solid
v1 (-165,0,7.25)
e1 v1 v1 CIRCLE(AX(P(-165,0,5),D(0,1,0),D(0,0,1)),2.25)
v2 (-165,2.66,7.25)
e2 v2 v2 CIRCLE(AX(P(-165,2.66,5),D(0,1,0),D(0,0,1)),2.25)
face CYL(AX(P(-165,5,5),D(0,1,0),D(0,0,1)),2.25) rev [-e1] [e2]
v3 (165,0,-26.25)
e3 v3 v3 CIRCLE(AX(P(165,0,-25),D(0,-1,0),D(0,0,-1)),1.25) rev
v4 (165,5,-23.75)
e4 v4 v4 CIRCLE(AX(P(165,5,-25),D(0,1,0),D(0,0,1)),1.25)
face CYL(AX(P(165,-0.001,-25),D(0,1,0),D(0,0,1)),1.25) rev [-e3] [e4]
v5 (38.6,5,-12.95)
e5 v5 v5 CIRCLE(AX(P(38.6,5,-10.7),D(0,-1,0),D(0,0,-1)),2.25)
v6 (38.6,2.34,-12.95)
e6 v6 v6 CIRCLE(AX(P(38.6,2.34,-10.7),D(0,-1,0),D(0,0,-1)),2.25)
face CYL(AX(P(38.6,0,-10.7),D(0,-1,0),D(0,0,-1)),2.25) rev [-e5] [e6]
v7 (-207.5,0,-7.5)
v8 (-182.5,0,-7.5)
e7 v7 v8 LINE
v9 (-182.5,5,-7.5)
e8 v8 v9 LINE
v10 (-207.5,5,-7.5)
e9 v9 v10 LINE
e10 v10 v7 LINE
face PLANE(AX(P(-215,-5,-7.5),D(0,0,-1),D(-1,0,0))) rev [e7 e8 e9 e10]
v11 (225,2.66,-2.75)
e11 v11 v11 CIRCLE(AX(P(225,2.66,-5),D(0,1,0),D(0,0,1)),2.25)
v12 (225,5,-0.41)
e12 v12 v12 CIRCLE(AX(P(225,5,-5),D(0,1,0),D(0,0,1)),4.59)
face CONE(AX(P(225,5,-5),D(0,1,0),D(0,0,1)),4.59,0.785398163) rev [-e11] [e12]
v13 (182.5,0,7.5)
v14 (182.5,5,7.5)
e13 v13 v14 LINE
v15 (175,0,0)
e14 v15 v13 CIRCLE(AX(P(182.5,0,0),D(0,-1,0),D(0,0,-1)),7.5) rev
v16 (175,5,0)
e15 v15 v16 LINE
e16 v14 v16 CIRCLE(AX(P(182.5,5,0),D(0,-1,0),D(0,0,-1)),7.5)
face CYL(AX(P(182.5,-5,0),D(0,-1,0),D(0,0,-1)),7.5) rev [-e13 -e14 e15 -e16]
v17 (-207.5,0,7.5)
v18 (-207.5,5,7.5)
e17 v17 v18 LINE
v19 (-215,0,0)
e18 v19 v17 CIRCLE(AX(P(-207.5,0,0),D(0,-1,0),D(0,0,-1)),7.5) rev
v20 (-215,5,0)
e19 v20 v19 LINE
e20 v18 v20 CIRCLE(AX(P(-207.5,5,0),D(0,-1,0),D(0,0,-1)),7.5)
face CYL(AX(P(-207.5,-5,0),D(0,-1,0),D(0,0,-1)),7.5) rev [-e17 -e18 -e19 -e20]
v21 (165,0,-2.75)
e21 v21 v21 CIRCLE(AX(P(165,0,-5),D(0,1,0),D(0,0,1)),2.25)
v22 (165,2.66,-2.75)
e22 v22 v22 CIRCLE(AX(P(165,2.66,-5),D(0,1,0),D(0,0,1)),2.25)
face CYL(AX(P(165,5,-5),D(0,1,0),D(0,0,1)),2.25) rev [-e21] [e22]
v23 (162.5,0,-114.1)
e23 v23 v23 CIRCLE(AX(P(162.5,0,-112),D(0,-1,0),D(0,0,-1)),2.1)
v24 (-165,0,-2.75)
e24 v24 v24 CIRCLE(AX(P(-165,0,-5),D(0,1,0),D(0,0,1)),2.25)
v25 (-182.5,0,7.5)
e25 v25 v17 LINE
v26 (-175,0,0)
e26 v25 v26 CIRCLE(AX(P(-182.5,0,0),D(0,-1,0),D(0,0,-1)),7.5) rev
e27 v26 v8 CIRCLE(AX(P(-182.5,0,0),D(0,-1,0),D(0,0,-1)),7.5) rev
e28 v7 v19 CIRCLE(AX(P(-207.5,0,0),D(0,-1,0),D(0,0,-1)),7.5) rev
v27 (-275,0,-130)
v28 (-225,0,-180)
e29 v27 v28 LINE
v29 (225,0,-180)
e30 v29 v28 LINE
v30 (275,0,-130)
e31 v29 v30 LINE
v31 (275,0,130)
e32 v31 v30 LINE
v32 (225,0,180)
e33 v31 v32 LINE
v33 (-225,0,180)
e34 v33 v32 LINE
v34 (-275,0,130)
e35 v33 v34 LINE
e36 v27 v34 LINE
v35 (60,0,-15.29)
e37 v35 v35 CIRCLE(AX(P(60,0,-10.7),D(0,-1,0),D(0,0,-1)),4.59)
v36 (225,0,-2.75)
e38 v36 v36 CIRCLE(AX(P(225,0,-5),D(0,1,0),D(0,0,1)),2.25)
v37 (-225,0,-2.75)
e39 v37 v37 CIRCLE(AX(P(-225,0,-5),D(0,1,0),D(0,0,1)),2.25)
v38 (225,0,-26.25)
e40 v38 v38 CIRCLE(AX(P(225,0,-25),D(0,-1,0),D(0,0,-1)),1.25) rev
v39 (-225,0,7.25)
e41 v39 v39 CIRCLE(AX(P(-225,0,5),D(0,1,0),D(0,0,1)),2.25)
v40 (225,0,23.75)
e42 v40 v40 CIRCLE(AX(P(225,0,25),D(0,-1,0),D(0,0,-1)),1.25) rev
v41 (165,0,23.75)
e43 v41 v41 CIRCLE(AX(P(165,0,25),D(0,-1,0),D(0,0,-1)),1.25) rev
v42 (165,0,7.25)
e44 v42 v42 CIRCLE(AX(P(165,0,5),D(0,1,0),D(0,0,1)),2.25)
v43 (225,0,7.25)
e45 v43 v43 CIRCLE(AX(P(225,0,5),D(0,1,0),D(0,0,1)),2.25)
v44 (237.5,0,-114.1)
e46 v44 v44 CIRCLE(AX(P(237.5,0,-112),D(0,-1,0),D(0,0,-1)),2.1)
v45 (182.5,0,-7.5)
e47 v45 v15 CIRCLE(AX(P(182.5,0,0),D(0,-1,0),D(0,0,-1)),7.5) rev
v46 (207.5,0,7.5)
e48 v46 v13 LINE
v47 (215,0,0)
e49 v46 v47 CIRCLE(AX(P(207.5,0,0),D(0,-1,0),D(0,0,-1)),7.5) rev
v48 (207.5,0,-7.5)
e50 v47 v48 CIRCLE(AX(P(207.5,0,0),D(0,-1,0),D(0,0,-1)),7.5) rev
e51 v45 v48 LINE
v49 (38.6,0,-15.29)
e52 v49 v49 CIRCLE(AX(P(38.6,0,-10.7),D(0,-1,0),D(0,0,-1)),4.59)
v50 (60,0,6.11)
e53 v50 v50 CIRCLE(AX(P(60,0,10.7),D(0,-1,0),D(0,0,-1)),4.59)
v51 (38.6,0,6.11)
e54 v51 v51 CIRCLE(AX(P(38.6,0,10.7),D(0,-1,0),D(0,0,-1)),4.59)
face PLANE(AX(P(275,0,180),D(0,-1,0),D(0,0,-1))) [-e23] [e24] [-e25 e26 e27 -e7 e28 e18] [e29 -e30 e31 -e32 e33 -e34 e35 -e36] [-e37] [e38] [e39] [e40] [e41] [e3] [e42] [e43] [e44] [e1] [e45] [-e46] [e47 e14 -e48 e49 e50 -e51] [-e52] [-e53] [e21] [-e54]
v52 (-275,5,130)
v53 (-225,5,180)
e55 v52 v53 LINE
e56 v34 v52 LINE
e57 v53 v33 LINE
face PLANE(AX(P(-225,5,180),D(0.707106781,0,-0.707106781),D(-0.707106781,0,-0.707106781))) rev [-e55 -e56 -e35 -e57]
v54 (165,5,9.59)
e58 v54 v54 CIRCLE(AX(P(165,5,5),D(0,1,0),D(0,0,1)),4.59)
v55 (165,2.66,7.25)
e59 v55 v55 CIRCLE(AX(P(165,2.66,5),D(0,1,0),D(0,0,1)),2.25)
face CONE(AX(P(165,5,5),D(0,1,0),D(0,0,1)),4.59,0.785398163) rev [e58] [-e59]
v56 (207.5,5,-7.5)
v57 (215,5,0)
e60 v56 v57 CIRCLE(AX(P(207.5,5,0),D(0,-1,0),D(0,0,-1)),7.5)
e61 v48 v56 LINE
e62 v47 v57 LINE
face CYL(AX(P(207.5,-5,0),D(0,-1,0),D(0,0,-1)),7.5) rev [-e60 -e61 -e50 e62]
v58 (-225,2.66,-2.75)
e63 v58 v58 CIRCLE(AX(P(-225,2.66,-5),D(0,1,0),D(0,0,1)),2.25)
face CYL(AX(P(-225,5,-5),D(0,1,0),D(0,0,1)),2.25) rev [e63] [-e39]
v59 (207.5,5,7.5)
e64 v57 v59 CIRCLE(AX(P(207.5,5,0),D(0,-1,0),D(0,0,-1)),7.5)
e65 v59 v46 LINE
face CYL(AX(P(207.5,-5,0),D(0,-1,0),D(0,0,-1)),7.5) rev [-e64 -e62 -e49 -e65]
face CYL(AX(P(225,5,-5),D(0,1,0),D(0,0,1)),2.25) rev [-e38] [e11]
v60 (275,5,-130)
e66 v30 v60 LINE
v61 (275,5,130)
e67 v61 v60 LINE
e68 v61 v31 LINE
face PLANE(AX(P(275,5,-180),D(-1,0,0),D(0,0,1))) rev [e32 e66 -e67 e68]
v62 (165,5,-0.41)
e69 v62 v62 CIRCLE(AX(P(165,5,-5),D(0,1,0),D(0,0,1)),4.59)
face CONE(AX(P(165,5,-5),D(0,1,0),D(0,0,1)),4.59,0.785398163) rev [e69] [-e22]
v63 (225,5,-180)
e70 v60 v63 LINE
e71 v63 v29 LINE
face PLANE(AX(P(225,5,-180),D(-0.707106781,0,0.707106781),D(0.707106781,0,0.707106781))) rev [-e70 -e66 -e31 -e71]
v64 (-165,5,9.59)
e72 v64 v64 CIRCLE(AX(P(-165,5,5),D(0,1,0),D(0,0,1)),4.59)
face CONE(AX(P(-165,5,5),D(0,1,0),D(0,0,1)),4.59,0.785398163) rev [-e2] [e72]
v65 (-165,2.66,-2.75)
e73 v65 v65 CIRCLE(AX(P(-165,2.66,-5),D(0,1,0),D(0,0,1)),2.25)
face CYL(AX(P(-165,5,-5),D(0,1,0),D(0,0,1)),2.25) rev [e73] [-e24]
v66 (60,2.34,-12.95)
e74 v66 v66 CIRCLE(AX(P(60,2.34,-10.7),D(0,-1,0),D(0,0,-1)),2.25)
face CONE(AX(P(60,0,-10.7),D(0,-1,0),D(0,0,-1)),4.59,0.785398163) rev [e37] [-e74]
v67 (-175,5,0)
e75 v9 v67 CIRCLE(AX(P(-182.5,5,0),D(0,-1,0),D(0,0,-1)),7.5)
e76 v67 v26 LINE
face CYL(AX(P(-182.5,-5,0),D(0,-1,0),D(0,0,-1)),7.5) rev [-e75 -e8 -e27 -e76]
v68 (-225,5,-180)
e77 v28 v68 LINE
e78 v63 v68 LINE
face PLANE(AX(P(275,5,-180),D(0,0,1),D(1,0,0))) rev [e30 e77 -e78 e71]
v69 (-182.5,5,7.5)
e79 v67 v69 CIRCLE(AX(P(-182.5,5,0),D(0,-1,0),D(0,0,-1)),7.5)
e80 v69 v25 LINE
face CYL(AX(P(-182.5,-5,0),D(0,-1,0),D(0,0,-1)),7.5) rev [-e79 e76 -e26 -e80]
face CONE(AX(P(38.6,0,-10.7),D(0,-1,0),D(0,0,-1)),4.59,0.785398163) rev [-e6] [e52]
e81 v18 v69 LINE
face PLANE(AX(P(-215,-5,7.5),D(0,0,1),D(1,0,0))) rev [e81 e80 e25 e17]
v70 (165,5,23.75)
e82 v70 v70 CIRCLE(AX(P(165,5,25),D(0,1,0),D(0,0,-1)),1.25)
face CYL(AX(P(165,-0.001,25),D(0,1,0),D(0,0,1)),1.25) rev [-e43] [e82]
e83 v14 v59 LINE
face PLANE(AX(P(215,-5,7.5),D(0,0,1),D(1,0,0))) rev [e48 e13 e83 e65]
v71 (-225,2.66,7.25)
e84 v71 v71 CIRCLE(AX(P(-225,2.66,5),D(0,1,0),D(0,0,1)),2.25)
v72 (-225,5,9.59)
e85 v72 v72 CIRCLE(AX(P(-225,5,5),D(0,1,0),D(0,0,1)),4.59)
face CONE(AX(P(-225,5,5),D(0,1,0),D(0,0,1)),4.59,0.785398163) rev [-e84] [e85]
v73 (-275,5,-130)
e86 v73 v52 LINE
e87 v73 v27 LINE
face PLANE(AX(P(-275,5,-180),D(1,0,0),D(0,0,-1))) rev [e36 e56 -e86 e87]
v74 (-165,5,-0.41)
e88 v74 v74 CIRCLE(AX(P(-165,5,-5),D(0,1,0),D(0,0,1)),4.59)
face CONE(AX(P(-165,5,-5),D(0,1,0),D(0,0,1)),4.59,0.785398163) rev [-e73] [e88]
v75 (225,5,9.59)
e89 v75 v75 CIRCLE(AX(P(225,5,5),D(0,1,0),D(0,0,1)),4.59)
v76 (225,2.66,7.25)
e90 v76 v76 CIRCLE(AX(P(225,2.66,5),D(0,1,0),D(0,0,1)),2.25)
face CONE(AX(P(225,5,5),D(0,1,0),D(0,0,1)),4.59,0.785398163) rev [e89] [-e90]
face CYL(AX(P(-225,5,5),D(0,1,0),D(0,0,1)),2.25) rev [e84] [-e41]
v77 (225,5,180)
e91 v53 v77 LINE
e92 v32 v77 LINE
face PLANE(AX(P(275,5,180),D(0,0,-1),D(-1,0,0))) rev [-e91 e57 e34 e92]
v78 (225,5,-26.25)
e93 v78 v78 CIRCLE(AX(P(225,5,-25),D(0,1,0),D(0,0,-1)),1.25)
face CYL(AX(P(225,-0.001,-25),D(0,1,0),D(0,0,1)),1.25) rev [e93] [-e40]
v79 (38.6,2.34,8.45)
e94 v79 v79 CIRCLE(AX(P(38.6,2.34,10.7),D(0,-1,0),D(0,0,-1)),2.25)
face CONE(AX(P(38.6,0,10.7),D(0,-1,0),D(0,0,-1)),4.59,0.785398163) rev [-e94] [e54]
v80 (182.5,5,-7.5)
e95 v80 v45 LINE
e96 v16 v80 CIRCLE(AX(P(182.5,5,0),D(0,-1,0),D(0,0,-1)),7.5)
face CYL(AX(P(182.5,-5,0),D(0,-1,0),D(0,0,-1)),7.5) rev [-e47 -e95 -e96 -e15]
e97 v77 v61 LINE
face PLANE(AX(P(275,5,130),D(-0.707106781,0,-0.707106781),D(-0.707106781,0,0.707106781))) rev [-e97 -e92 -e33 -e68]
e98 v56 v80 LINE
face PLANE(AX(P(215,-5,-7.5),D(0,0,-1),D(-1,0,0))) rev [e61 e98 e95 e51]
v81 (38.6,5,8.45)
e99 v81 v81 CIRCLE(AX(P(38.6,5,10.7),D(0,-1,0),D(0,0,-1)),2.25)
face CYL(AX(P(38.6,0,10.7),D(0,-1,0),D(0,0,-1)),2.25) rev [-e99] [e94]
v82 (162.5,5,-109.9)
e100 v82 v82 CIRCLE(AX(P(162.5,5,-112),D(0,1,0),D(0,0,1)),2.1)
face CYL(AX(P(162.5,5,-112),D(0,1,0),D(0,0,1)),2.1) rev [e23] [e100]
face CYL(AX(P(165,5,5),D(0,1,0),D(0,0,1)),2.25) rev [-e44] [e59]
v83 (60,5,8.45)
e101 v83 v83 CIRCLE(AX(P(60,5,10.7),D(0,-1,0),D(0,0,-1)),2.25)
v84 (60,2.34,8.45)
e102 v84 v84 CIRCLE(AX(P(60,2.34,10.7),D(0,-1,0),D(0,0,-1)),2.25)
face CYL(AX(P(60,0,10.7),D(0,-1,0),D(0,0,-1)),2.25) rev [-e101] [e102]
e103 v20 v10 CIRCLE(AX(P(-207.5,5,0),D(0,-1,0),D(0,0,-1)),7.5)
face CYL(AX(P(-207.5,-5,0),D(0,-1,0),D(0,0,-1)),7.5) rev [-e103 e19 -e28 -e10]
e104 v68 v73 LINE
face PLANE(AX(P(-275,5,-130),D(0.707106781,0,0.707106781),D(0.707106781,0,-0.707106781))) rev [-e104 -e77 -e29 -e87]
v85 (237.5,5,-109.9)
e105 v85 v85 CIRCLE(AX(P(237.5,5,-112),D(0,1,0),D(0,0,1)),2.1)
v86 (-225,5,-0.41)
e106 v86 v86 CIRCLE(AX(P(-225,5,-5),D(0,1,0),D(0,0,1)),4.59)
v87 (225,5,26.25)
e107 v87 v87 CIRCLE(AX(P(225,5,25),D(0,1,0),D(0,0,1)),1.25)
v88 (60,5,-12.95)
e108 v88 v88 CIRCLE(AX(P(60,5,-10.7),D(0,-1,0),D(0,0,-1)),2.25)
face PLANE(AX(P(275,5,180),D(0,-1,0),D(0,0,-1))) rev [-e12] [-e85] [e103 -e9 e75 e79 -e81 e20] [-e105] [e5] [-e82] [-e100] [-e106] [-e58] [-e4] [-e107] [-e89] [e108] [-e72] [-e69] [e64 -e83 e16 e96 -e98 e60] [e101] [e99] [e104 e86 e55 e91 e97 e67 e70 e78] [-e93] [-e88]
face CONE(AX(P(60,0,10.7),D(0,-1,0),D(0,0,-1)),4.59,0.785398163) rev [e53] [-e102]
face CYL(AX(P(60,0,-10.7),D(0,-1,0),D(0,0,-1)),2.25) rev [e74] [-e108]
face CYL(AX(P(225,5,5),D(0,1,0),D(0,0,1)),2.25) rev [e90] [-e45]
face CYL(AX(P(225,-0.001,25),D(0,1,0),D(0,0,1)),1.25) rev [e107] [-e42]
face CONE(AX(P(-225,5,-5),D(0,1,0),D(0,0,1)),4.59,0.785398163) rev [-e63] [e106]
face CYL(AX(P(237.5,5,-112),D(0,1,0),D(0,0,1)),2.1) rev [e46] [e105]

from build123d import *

# Parameters (mm, degrees)
SKETCH1_W                                            = 550
SKETCH1_H                                            = 360
BOSS_EXTRUDE1_DEPTH                                  = 5
SKETCH2_W                                            = 40
SKETCH2_H                                            = 15
CUT_EXTRUDE1_DEPTH                                   = 10
FILLET1_R                                            = 7.5
CHAMFER1_SIZE                                        = 50
SKETCH8_R                                            = 1.5
CUT_EXTRUDE5_DEPTH                                   = 10
CSK_FOR_M4_HEX_SOCKET_COUNTERSUNK_HEAD_S_D           = 4.5
CSK_FOR_M4_HEX_SOCKET_COUNTERSUNK_HEAD_S_CSINK_D     = 9.18
CSK_FOR_M4_HEX_SOCKET_COUNTERSUNK_HEAD_S_CSINK_ANGLE = 90
SKETCH10_R                                           = 2
CUT_EXTRUDE6_DEPTH                                   = 10
M5_TAPPED_HOLE1_D                                    = 4.2
M5_TAPPED_HOLE1_DEPTH                                = 12.4
M5_TAPPED_HOLE1_TIP                                  = 1.2618073
CUT_EXTRUDE8_REACH                                   = 330.71
SKETCH14_R                                           = 1.25
M3_TAPPED_HOLE1_D                                    = 2.5
M3_TAPPED_HOLE1_DEPTH                                = 7.5
M3_TAPPED_HOLE1_TIP                                  = 0.751075774
SKETCH16_R                                           = 1.5
CUT_EXTRUDE9_DEPTH                                   = 329.709598278
CSK_FOR_M4_HEX_SOCKET_COUNTERSUNK_HE_2_D             = 4.5
CSK_FOR_M4_HEX_SOCKET_COUNTERSUNK_HE_2_CSINK_D       = 9.18
CSK_FOR_M4_HEX_SOCKET_COUNTERSUNK_HE_2_CSINK_ANGLE   = 90


with BuildPart() as part:
    # Sketch1 → Boss-Extrude1 (new body)
    with BuildSketch(Plane(origin=(0, 0, 0), x_dir=(1, 0, 0), z_dir=(0, 1, 0))):
        Rectangle(SKETCH1_W, SKETCH1_H)
    extrude(amount=BOSS_EXTRUDE1_DEPTH)

    # Sketch2 → Cut-Extrude1 (cut)
    with BuildSketch(Plane(origin=(0, 5, 0), x_dir=(1, 0, 0), z_dir=(0, 1, 0))):
        with Locations((195, 0)):
            Rectangle(SKETCH2_W, SKETCH2_H)
        with Locations((-195, 0)):
            Rectangle(SKETCH2_W, SKETCH2_H)
    extrude(amount=-CUT_EXTRUDE1_DEPTH, mode=Mode.SUBTRACT)

    # Fillet1
    fillet1_edges = [part.edges().sort_by_distance(p)[0] for p in [
        (-175, 2.5, 7.5),
        (-175, 2.5, -7.5),
        (-215, 2.5, -7.5),
        (-215, 2.5, 7.5),
        (175, 2.5, 7.5),
        (175, 2.5, -7.5),
        (215, 2.5, -7.5),
        (215, 2.5, 7.5),
    ]]
    fillet(fillet1_edges, radius=FILLET1_R - 0.0001)  # a hair under: the kernel refuses the full size

    # Chamfer1
    chamfer1_edges = [part.edges().sort_by_distance(p)[0] for p in [
        (275, 2.5, 180),
        (-275, 2.5, 180),
        (-275, 2.5, -180),
        (275, 2.5, -180),
    ]]
    chamfer(chamfer1_edges, length=CHAMFER1_SIZE)

    # Sketch8 → Cut-Extrude5 (cut)
    with BuildSketch(Plane(origin=(0, 5, 0), x_dir=(1, 0, 0), z_dir=(0, 1, 0))):
        with Locations(Location((225, 5, 0), (0, 0, 270))):
            Circle(SKETCH8_R)
        with Locations(Location((165, 5, 0), (0, 0, 90))):
            Circle(SKETCH8_R)
        with Locations(Location((165, -5, 0), (0, 0, 270))):
            Circle(SKETCH8_R)
        with Locations(Location((225, -5, 0), (0, 0, 90))):
            Circle(SKETCH8_R)
        with Locations(Location((-225, -5, 0), (0, 0, 270))):
            Circle(SKETCH8_R)
        with Locations(Location((-165, -5, 0), (0, 0, 90))):
            Circle(SKETCH8_R)
        with Locations(Location((-165, 5, 0), (0, 0, 270))):
            Circle(SKETCH8_R)
        with Locations(Location((-225, 5, 0), (0, 0, 90))):
            Circle(SKETCH8_R)
    extrude(amount=-CUT_EXTRUDE5_DEPTH, mode=Mode.SUBTRACT)

    # CSK for M4 Hex Socket Countersunk Head S (through all)
    with Locations(Plane(origin=(-225, 5, -5), x_dir=(0, 0, 1), z_dir=(0, 1, 0))):
        with Locations((0, 0), (10, 0), (10, 60), (0, 60), (10, 390), (0, 390), (0, 450), (10, 450)):
            CounterSinkHole(CSK_FOR_M4_HEX_SOCKET_COUNTERSUNK_HEAD_S_D / 2, CSK_FOR_M4_HEX_SOCKET_COUNTERSUNK_HEAD_S_CSINK_D / 2, counter_sink_angle=CSK_FOR_M4_HEX_SOCKET_COUNTERSUNK_HEAD_S_CSINK_ANGLE)

    # Sketch10 → Cut-Extrude6 (cut)
    with BuildSketch(Plane(origin=(0, 5, 0), x_dir=(1, 0, 0), z_dir=(0, 1, 0))):
        with Locations(Location((237.5, 112, 0), (0, 0, 270))):
            Circle(SKETCH10_R)
        with Locations(Location((162.5, 112, 0), (0, 0, 90))):
            Circle(SKETCH10_R)
    extrude(amount=-CUT_EXTRUDE6_DEPTH, mode=Mode.SUBTRACT)

    # M5 Tapped Hole1
    with Locations(Plane(origin=(237.5, 5, -112), x_dir=(0, 0, 1), z_dir=(0, 1, 0))):
        with Locations((0, 0), (0, -75)):
            Hole(M5_TAPPED_HOLE1_D / 2, depth=M5_TAPPED_HOLE1_DEPTH)
            with Locations((0, 0, -(M5_TAPPED_HOLE1_DEPTH + M5_TAPPED_HOLE1_TIP / 2))):  # 118° drill point
                Cone(0, M5_TAPPED_HOLE1_D / 2, M5_TAPPED_HOLE1_TIP, mode=Mode.SUBTRACT)

    # Sketch14 → Cut-Extrude8 (cut, up to next)
    with BuildSketch(Plane(origin=(0, 5, 0), x_dir=(-1, 0, 0), z_dir=(0, 1, 0)), mode=Mode.PRIVATE) as cut_extrude8_sk1:
        with Locations(Location((-225, 25, 0), (0, 0, 90))):
            Circle(SKETCH14_R)
    cut_extrude8_tool1 = extrude(cut_extrude8_sk1.sketch, amount=-CUT_EXTRUDE8_REACH, mode=Mode.PRIVATE) & part.part
    # Sketch14 → Cut-Extrude8 (cut, up to next)
    with BuildSketch(Plane(origin=(0, 5, 0), x_dir=(-1, 0, 0), z_dir=(0, 1, 0)), mode=Mode.PRIVATE) as cut_extrude8_sk2:
        with Locations(Location((-225, -25, 0), (0, 0, 270))):
            Circle(SKETCH14_R)
    cut_extrude8_tool2 = extrude(cut_extrude8_sk2.sketch, amount=-CUT_EXTRUDE8_REACH, mode=Mode.PRIVATE) & part.part
    # Sketch14 → Cut-Extrude8 (cut, up to next)
    with BuildSketch(Plane(origin=(0, 5, 0), x_dir=(-1, 0, 0), z_dir=(0, 1, 0)), mode=Mode.PRIVATE) as cut_extrude8_sk3:
        with Locations(Location((-165, 25, 0), (0, 0, 270))):
            Circle(SKETCH14_R)
    cut_extrude8_tool3 = extrude(cut_extrude8_sk3.sketch, amount=-CUT_EXTRUDE8_REACH, mode=Mode.PRIVATE) & part.part
    # Sketch14 → Cut-Extrude8 (cut, up to next)
    with BuildSketch(Plane(origin=(0, 5, 0), x_dir=(-1, 0, 0), z_dir=(0, 1, 0)), mode=Mode.PRIVATE) as cut_extrude8_sk4:
        with Locations(Location((-165, -25, 0), (0, 0, 90))):
            Circle(SKETCH14_R)
    cut_extrude8_tool4 = extrude(cut_extrude8_sk4.sketch, amount=-CUT_EXTRUDE8_REACH, mode=Mode.PRIVATE) & part.part
    add(cut_extrude8_tool1.solids().sort_by_distance((225, 5, 25))[0], mode=Mode.SUBTRACT)
    add(cut_extrude8_tool2.solids().sort_by_distance((225, 5, -25))[0], mode=Mode.SUBTRACT)
    add(cut_extrude8_tool3.solids().sort_by_distance((165, 5, 25))[0], mode=Mode.SUBTRACT)
    add(cut_extrude8_tool4.solids().sort_by_distance((165, 5, -25))[0], mode=Mode.SUBTRACT)

    # M3 Tapped Hole1
    with Locations(Plane(origin=(225, 5, 25), x_dir=(0, 0, 1), z_dir=(0, 1, 0))):
        with Locations((0, 0), (0, -60), (-50, -60), (-50, 0)):
            Hole(M3_TAPPED_HOLE1_D / 2, depth=M3_TAPPED_HOLE1_DEPTH)
            with Locations((0, 0, -(M3_TAPPED_HOLE1_DEPTH + M3_TAPPED_HOLE1_TIP / 2))):  # 118° drill point
                Cone(0, M3_TAPPED_HOLE1_D / 2, M3_TAPPED_HOLE1_TIP, mode=Mode.SUBTRACT)

    # Sketch16 → Cut-Extrude9 (cut, through all)
    with BuildSketch(Plane(origin=(0, 5, 0), x_dir=(1, 0, 0), z_dir=(0, 1, 0))):
        with Locations(Location((38.6, 10.7, 0), (0, 0, 270))):
            Circle(SKETCH16_R)
        with Locations(Location((60, 10.7, 0), (0, 0, 270))):
            Circle(SKETCH16_R)
        with Locations(Location((38.6, -10.7, 0), (0, 0, 270))):
            Circle(SKETCH16_R)
        with Locations(Location((60, -10.7, 0), (0, 0, 270))):
            Circle(SKETCH16_R)
    extrude(amount=-CUT_EXTRUDE9_DEPTH, mode=Mode.SUBTRACT)

    # CSK for M4 Hex Socket Countersunk He 2 (through all)
    with Locations(Plane(origin=(60, 0, -10.7), x_dir=(0, 0, -1), z_dir=(0, -1, 0))):
        with Locations((0, 0), (0, -21.4), (-21.4, -21.4), (-21.4, 0)):
            CounterSinkHole(CSK_FOR_M4_HEX_SOCKET_COUNTERSUNK_HE_2_D / 2, CSK_FOR_M4_HEX_SOCKET_COUNTERSUNK_HE_2_CSINK_D / 2, counter_sink_angle=CSK_FOR_M4_HEX_SOCKET_COUNTERSUNK_HE_2_CSINK_ANGLE)


solid = part.part
